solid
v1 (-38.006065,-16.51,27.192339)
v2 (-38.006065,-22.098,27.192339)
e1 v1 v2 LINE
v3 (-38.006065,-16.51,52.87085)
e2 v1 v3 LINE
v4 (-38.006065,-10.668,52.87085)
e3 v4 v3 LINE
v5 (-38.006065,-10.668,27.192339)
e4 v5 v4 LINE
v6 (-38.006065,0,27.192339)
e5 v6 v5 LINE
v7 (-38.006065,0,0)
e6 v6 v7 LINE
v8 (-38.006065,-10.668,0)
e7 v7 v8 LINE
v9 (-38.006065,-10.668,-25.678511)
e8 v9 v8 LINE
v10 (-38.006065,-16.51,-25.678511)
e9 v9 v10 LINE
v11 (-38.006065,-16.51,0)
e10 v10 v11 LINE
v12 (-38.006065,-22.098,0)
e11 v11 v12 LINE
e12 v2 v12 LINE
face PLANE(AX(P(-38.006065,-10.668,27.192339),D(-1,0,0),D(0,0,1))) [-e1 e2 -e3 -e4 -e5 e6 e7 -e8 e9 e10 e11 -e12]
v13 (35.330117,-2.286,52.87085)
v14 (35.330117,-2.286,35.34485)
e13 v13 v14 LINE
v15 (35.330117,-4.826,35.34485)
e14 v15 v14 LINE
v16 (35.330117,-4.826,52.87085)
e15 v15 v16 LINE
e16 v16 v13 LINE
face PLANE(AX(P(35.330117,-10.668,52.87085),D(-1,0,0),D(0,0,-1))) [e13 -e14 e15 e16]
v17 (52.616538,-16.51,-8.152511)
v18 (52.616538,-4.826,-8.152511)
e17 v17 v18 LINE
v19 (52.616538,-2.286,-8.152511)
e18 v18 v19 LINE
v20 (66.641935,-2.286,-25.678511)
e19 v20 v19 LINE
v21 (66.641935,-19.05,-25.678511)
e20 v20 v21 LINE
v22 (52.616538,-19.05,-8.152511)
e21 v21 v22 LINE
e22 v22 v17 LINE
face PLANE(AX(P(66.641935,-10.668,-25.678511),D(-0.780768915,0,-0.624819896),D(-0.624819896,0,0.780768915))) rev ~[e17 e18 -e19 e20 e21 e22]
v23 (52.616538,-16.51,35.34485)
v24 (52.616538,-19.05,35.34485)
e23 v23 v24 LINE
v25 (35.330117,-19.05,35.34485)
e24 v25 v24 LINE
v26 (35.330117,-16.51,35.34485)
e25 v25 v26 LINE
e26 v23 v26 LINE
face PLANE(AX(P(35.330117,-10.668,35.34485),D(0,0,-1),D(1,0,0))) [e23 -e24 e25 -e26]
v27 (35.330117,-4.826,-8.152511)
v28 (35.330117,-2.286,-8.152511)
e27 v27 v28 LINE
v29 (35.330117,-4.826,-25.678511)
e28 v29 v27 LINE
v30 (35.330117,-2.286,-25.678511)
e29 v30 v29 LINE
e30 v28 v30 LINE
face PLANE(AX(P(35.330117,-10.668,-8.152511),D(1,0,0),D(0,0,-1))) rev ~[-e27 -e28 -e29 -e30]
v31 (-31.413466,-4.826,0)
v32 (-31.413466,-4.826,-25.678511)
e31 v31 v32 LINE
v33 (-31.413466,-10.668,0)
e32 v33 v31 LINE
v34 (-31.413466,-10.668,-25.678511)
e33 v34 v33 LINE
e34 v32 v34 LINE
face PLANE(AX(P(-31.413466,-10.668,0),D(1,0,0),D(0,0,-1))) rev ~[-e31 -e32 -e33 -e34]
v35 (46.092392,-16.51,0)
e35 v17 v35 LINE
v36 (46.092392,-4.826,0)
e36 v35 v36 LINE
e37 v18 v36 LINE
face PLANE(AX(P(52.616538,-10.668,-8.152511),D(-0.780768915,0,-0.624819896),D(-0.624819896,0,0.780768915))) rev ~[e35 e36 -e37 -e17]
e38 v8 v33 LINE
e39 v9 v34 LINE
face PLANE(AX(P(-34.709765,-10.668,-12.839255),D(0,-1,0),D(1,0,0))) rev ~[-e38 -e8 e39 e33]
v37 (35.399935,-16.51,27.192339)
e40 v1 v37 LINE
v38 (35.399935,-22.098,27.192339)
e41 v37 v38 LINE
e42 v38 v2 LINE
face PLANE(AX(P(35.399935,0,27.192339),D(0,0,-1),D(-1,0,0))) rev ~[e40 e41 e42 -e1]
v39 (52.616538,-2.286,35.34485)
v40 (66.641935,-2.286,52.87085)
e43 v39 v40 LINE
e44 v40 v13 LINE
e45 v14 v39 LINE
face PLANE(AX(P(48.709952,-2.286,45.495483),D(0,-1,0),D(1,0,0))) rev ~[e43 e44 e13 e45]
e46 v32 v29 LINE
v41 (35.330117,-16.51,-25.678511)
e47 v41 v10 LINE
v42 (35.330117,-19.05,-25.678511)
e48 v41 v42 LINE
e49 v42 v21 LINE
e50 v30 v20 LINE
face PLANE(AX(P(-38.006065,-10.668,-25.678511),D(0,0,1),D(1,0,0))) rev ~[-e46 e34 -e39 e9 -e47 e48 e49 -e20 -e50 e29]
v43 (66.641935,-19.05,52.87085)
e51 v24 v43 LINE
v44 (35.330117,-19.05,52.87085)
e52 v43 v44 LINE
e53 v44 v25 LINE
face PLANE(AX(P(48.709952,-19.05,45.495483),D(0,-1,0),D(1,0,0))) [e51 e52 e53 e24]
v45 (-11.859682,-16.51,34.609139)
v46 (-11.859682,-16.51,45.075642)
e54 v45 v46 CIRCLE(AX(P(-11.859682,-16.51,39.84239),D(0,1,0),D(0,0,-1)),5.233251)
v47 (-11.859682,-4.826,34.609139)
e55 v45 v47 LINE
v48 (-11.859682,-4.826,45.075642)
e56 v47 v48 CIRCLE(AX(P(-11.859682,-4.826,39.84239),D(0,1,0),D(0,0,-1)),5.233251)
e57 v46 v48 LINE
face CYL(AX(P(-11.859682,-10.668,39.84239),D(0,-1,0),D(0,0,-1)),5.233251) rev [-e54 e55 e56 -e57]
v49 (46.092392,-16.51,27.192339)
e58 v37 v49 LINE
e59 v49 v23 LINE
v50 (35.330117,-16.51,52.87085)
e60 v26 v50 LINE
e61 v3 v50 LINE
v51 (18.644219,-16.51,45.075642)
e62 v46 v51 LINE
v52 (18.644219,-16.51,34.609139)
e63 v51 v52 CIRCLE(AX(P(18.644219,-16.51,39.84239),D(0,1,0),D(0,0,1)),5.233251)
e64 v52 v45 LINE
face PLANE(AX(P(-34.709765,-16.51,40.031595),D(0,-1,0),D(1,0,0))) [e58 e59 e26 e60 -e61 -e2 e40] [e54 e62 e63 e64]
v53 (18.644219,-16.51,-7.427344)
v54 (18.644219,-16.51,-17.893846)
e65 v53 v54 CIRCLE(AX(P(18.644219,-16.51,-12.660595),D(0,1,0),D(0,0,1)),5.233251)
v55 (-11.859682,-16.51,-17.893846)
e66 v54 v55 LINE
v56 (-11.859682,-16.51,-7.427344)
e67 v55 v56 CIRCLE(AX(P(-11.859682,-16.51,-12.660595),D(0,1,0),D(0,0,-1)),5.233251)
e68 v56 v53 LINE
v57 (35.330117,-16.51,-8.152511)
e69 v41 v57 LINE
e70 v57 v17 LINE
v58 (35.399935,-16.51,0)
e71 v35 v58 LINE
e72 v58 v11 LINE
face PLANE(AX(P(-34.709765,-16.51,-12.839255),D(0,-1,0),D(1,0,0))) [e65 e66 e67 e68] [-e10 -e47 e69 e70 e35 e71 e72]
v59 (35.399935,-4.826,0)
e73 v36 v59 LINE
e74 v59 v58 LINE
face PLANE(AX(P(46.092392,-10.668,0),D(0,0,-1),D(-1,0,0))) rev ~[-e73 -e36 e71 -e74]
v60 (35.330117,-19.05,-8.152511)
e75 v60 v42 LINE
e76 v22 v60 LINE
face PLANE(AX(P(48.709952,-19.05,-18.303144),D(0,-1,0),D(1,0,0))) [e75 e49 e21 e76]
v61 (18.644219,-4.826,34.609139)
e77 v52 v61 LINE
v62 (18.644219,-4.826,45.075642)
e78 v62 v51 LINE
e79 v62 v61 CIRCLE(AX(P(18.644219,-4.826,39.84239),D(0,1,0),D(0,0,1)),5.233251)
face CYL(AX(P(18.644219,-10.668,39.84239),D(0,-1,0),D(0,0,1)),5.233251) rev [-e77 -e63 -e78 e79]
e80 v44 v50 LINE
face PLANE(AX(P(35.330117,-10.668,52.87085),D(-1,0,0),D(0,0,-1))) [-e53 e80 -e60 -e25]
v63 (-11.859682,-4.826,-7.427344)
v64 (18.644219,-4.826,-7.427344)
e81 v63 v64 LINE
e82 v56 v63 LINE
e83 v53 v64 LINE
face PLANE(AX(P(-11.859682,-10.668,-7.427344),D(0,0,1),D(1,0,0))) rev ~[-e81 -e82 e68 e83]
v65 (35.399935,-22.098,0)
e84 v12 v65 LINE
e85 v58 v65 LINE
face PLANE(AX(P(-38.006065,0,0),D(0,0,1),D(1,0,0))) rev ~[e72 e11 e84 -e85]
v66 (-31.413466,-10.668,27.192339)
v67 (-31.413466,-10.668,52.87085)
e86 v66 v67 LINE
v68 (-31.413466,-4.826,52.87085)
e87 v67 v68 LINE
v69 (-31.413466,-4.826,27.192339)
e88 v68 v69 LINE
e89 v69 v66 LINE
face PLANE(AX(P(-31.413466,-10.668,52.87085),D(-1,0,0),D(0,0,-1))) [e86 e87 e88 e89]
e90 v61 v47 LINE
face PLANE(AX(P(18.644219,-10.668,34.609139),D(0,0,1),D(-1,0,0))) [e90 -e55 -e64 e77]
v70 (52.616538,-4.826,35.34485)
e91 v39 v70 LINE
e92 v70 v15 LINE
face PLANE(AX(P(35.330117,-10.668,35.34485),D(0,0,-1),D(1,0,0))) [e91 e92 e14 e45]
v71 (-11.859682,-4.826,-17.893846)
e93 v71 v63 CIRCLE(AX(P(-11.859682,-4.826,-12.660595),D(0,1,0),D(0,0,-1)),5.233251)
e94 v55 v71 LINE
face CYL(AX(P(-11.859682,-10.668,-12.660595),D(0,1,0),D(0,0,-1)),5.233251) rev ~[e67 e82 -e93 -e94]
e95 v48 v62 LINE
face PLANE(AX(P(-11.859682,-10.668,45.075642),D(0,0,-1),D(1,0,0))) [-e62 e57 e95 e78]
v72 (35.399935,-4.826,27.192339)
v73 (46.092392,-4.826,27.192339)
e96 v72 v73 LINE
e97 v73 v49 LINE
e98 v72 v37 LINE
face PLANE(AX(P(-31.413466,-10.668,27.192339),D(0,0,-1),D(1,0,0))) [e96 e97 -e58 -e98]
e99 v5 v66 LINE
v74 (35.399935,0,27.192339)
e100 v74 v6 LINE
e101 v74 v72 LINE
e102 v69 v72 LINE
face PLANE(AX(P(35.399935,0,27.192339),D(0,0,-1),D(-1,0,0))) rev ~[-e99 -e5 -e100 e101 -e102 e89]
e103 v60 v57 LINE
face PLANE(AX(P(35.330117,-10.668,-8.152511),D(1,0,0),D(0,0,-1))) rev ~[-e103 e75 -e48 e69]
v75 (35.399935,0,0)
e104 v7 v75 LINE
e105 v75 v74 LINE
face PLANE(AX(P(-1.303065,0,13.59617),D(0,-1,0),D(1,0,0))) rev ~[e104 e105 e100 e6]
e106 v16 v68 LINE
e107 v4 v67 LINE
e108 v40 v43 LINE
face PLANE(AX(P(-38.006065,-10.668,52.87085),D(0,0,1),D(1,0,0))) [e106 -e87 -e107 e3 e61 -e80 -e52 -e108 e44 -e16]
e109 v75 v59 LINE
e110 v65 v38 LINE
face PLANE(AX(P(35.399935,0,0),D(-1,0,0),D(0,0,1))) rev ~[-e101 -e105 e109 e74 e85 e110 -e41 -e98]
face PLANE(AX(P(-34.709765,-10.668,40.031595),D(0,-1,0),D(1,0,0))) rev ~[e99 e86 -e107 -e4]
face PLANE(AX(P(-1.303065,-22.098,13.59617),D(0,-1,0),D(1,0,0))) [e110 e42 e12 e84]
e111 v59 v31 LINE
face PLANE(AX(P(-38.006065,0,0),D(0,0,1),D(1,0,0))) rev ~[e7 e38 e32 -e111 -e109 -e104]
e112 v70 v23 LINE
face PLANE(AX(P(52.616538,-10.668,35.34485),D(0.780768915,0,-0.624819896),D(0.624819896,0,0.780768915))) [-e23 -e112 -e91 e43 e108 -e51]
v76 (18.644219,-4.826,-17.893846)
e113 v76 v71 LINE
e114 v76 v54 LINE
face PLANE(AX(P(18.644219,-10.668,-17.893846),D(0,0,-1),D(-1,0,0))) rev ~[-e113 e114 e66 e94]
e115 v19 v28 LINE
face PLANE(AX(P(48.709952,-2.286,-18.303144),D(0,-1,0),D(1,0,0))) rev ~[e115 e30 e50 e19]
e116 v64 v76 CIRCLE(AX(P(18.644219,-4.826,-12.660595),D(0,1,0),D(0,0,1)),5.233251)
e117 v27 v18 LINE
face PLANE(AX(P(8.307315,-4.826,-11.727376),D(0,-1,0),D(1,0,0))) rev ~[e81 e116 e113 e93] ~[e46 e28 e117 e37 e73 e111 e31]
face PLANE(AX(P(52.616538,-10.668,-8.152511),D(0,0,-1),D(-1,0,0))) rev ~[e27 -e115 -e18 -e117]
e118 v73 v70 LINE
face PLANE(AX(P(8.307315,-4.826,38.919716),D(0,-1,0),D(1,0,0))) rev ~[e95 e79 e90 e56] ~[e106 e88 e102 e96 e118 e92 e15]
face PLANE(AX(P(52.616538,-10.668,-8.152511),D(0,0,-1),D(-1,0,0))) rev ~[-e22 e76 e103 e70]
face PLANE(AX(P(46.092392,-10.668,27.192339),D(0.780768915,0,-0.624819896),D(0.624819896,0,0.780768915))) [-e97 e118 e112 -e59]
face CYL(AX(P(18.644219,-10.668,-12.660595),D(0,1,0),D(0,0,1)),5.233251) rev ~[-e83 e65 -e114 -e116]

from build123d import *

# Parameters (mm, degrees)
F1_DEPTH = 22.098
F4_DEPTH = 5.842
F5_DEPTH = 8.382
F3_W     = 6.592599522
F3_H     = 25.6785105251
F6_DEPTH = 5.842
F7_DEPTH = 5.842


with BuildPart() as f1:
    # F0 (on Front) → F1 (new body)
    with BuildSketch(Plane.XZ):
        Polygon((-38.0060652603, 0), (35.3999347397, 0), (35.3999347397, 27.1923393011), (-38.0060652603, 27.1923393011), (-38.0060652603, 18.1223209947), (-38.0060652603, 10.0105842575), align=None)
    extrude(amount=F1_DEPTH)

    # F3 (on offset) → F4 (join, symmetric)
    with BuildSketch(Plane.XZ.offset(10.668)):
        Polygon((35.3301167488, 0), (-31.4134657383, 0), (-31.4134657383, -25.6785105251), (35.3301167488, -25.6785105251), (35.3301167488, -8.1525105251), (52.6165383837, -8.1525105251), (46.0923918922, 0), align=None)
        with BuildLine():
            Line((18.6442192644, -17.8938459214), (-11.8596823886, -17.8938459214))
            ThreePointArc((-11.8596823886, -17.8938459214), (-17.0929335328, -12.6605947772), (-11.8596823886, -7.427343633))
            Line((-11.8596823886, -7.427343633), (18.6442192644, -7.427343633))
            ThreePointArc((18.6442192644, -7.427343633), (23.8774704086, -12.6605947772), (18.6442192644, -17.8938459214))
        make_face(mode=Mode.SUBTRACT)
        Polygon((-31.4134657383, 52.8708498262), (-31.4134657383, 27.1923393011), (46.0923918922, 27.1923393011), (52.6165383837, 35.3448498262), (35.3301167488, 35.3448498262), (35.3301167488, 52.8708498262), align=None)
        with BuildLine():
            ThreePointArc((18.6442192644, 45.0756415895), (23.8774704086, 39.8423904453), (18.6442192644, 34.6091393011))
            Line((18.6442192644, 34.6091393011), (-11.8596823886, 34.6091393011))
            ThreePointArc((-11.8596823886, 34.6091393011), (-17.0929335328, 39.8423904453), (-11.8596823886, 45.0756415895))
            Line((-11.8596823886, 45.0756415895), (18.6442192644, 45.0756415895))
        make_face(mode=Mode.SUBTRACT)
    extrude(amount=F4_DEPTH, both=True)

    # F3 (on offset) → F5 (join, symmetric)
    with BuildSketch(Plane.XZ.offset(10.668)):
        Polygon((35.3301167488, -8.1525105251), (35.3301167488, -25.6785105251), (66.6419347397, -25.6785105251), (52.6165383837, -8.1525105251), align=None)
        Polygon((35.3301167488, 35.3448498262), (52.6165383837, 35.3448498262), (66.6419347397, 52.8708498262), (35.3301167488, 52.8708498262), align=None)
    extrude(amount=F5_DEPTH, both=True)

    # F3 (on offset) → F6 (join, through all)
    with BuildSketch(Plane.XZ.offset(10.668)):
        with Locations((-34.7097654993, -12.8392552625)):
            Rectangle(F3_W, F3_H)
    extrude(amount=F6_DEPTH)

    # F3 (on offset) → F7 (join, through all)
    with BuildSketch(Plane.XZ.offset(10.668)):
        with Locations((-34.7097654993, 40.0315945636)):
            Rectangle(F3_W, F3_H)
    extrude(amount=F7_DEPTH)


solid = f1.part
